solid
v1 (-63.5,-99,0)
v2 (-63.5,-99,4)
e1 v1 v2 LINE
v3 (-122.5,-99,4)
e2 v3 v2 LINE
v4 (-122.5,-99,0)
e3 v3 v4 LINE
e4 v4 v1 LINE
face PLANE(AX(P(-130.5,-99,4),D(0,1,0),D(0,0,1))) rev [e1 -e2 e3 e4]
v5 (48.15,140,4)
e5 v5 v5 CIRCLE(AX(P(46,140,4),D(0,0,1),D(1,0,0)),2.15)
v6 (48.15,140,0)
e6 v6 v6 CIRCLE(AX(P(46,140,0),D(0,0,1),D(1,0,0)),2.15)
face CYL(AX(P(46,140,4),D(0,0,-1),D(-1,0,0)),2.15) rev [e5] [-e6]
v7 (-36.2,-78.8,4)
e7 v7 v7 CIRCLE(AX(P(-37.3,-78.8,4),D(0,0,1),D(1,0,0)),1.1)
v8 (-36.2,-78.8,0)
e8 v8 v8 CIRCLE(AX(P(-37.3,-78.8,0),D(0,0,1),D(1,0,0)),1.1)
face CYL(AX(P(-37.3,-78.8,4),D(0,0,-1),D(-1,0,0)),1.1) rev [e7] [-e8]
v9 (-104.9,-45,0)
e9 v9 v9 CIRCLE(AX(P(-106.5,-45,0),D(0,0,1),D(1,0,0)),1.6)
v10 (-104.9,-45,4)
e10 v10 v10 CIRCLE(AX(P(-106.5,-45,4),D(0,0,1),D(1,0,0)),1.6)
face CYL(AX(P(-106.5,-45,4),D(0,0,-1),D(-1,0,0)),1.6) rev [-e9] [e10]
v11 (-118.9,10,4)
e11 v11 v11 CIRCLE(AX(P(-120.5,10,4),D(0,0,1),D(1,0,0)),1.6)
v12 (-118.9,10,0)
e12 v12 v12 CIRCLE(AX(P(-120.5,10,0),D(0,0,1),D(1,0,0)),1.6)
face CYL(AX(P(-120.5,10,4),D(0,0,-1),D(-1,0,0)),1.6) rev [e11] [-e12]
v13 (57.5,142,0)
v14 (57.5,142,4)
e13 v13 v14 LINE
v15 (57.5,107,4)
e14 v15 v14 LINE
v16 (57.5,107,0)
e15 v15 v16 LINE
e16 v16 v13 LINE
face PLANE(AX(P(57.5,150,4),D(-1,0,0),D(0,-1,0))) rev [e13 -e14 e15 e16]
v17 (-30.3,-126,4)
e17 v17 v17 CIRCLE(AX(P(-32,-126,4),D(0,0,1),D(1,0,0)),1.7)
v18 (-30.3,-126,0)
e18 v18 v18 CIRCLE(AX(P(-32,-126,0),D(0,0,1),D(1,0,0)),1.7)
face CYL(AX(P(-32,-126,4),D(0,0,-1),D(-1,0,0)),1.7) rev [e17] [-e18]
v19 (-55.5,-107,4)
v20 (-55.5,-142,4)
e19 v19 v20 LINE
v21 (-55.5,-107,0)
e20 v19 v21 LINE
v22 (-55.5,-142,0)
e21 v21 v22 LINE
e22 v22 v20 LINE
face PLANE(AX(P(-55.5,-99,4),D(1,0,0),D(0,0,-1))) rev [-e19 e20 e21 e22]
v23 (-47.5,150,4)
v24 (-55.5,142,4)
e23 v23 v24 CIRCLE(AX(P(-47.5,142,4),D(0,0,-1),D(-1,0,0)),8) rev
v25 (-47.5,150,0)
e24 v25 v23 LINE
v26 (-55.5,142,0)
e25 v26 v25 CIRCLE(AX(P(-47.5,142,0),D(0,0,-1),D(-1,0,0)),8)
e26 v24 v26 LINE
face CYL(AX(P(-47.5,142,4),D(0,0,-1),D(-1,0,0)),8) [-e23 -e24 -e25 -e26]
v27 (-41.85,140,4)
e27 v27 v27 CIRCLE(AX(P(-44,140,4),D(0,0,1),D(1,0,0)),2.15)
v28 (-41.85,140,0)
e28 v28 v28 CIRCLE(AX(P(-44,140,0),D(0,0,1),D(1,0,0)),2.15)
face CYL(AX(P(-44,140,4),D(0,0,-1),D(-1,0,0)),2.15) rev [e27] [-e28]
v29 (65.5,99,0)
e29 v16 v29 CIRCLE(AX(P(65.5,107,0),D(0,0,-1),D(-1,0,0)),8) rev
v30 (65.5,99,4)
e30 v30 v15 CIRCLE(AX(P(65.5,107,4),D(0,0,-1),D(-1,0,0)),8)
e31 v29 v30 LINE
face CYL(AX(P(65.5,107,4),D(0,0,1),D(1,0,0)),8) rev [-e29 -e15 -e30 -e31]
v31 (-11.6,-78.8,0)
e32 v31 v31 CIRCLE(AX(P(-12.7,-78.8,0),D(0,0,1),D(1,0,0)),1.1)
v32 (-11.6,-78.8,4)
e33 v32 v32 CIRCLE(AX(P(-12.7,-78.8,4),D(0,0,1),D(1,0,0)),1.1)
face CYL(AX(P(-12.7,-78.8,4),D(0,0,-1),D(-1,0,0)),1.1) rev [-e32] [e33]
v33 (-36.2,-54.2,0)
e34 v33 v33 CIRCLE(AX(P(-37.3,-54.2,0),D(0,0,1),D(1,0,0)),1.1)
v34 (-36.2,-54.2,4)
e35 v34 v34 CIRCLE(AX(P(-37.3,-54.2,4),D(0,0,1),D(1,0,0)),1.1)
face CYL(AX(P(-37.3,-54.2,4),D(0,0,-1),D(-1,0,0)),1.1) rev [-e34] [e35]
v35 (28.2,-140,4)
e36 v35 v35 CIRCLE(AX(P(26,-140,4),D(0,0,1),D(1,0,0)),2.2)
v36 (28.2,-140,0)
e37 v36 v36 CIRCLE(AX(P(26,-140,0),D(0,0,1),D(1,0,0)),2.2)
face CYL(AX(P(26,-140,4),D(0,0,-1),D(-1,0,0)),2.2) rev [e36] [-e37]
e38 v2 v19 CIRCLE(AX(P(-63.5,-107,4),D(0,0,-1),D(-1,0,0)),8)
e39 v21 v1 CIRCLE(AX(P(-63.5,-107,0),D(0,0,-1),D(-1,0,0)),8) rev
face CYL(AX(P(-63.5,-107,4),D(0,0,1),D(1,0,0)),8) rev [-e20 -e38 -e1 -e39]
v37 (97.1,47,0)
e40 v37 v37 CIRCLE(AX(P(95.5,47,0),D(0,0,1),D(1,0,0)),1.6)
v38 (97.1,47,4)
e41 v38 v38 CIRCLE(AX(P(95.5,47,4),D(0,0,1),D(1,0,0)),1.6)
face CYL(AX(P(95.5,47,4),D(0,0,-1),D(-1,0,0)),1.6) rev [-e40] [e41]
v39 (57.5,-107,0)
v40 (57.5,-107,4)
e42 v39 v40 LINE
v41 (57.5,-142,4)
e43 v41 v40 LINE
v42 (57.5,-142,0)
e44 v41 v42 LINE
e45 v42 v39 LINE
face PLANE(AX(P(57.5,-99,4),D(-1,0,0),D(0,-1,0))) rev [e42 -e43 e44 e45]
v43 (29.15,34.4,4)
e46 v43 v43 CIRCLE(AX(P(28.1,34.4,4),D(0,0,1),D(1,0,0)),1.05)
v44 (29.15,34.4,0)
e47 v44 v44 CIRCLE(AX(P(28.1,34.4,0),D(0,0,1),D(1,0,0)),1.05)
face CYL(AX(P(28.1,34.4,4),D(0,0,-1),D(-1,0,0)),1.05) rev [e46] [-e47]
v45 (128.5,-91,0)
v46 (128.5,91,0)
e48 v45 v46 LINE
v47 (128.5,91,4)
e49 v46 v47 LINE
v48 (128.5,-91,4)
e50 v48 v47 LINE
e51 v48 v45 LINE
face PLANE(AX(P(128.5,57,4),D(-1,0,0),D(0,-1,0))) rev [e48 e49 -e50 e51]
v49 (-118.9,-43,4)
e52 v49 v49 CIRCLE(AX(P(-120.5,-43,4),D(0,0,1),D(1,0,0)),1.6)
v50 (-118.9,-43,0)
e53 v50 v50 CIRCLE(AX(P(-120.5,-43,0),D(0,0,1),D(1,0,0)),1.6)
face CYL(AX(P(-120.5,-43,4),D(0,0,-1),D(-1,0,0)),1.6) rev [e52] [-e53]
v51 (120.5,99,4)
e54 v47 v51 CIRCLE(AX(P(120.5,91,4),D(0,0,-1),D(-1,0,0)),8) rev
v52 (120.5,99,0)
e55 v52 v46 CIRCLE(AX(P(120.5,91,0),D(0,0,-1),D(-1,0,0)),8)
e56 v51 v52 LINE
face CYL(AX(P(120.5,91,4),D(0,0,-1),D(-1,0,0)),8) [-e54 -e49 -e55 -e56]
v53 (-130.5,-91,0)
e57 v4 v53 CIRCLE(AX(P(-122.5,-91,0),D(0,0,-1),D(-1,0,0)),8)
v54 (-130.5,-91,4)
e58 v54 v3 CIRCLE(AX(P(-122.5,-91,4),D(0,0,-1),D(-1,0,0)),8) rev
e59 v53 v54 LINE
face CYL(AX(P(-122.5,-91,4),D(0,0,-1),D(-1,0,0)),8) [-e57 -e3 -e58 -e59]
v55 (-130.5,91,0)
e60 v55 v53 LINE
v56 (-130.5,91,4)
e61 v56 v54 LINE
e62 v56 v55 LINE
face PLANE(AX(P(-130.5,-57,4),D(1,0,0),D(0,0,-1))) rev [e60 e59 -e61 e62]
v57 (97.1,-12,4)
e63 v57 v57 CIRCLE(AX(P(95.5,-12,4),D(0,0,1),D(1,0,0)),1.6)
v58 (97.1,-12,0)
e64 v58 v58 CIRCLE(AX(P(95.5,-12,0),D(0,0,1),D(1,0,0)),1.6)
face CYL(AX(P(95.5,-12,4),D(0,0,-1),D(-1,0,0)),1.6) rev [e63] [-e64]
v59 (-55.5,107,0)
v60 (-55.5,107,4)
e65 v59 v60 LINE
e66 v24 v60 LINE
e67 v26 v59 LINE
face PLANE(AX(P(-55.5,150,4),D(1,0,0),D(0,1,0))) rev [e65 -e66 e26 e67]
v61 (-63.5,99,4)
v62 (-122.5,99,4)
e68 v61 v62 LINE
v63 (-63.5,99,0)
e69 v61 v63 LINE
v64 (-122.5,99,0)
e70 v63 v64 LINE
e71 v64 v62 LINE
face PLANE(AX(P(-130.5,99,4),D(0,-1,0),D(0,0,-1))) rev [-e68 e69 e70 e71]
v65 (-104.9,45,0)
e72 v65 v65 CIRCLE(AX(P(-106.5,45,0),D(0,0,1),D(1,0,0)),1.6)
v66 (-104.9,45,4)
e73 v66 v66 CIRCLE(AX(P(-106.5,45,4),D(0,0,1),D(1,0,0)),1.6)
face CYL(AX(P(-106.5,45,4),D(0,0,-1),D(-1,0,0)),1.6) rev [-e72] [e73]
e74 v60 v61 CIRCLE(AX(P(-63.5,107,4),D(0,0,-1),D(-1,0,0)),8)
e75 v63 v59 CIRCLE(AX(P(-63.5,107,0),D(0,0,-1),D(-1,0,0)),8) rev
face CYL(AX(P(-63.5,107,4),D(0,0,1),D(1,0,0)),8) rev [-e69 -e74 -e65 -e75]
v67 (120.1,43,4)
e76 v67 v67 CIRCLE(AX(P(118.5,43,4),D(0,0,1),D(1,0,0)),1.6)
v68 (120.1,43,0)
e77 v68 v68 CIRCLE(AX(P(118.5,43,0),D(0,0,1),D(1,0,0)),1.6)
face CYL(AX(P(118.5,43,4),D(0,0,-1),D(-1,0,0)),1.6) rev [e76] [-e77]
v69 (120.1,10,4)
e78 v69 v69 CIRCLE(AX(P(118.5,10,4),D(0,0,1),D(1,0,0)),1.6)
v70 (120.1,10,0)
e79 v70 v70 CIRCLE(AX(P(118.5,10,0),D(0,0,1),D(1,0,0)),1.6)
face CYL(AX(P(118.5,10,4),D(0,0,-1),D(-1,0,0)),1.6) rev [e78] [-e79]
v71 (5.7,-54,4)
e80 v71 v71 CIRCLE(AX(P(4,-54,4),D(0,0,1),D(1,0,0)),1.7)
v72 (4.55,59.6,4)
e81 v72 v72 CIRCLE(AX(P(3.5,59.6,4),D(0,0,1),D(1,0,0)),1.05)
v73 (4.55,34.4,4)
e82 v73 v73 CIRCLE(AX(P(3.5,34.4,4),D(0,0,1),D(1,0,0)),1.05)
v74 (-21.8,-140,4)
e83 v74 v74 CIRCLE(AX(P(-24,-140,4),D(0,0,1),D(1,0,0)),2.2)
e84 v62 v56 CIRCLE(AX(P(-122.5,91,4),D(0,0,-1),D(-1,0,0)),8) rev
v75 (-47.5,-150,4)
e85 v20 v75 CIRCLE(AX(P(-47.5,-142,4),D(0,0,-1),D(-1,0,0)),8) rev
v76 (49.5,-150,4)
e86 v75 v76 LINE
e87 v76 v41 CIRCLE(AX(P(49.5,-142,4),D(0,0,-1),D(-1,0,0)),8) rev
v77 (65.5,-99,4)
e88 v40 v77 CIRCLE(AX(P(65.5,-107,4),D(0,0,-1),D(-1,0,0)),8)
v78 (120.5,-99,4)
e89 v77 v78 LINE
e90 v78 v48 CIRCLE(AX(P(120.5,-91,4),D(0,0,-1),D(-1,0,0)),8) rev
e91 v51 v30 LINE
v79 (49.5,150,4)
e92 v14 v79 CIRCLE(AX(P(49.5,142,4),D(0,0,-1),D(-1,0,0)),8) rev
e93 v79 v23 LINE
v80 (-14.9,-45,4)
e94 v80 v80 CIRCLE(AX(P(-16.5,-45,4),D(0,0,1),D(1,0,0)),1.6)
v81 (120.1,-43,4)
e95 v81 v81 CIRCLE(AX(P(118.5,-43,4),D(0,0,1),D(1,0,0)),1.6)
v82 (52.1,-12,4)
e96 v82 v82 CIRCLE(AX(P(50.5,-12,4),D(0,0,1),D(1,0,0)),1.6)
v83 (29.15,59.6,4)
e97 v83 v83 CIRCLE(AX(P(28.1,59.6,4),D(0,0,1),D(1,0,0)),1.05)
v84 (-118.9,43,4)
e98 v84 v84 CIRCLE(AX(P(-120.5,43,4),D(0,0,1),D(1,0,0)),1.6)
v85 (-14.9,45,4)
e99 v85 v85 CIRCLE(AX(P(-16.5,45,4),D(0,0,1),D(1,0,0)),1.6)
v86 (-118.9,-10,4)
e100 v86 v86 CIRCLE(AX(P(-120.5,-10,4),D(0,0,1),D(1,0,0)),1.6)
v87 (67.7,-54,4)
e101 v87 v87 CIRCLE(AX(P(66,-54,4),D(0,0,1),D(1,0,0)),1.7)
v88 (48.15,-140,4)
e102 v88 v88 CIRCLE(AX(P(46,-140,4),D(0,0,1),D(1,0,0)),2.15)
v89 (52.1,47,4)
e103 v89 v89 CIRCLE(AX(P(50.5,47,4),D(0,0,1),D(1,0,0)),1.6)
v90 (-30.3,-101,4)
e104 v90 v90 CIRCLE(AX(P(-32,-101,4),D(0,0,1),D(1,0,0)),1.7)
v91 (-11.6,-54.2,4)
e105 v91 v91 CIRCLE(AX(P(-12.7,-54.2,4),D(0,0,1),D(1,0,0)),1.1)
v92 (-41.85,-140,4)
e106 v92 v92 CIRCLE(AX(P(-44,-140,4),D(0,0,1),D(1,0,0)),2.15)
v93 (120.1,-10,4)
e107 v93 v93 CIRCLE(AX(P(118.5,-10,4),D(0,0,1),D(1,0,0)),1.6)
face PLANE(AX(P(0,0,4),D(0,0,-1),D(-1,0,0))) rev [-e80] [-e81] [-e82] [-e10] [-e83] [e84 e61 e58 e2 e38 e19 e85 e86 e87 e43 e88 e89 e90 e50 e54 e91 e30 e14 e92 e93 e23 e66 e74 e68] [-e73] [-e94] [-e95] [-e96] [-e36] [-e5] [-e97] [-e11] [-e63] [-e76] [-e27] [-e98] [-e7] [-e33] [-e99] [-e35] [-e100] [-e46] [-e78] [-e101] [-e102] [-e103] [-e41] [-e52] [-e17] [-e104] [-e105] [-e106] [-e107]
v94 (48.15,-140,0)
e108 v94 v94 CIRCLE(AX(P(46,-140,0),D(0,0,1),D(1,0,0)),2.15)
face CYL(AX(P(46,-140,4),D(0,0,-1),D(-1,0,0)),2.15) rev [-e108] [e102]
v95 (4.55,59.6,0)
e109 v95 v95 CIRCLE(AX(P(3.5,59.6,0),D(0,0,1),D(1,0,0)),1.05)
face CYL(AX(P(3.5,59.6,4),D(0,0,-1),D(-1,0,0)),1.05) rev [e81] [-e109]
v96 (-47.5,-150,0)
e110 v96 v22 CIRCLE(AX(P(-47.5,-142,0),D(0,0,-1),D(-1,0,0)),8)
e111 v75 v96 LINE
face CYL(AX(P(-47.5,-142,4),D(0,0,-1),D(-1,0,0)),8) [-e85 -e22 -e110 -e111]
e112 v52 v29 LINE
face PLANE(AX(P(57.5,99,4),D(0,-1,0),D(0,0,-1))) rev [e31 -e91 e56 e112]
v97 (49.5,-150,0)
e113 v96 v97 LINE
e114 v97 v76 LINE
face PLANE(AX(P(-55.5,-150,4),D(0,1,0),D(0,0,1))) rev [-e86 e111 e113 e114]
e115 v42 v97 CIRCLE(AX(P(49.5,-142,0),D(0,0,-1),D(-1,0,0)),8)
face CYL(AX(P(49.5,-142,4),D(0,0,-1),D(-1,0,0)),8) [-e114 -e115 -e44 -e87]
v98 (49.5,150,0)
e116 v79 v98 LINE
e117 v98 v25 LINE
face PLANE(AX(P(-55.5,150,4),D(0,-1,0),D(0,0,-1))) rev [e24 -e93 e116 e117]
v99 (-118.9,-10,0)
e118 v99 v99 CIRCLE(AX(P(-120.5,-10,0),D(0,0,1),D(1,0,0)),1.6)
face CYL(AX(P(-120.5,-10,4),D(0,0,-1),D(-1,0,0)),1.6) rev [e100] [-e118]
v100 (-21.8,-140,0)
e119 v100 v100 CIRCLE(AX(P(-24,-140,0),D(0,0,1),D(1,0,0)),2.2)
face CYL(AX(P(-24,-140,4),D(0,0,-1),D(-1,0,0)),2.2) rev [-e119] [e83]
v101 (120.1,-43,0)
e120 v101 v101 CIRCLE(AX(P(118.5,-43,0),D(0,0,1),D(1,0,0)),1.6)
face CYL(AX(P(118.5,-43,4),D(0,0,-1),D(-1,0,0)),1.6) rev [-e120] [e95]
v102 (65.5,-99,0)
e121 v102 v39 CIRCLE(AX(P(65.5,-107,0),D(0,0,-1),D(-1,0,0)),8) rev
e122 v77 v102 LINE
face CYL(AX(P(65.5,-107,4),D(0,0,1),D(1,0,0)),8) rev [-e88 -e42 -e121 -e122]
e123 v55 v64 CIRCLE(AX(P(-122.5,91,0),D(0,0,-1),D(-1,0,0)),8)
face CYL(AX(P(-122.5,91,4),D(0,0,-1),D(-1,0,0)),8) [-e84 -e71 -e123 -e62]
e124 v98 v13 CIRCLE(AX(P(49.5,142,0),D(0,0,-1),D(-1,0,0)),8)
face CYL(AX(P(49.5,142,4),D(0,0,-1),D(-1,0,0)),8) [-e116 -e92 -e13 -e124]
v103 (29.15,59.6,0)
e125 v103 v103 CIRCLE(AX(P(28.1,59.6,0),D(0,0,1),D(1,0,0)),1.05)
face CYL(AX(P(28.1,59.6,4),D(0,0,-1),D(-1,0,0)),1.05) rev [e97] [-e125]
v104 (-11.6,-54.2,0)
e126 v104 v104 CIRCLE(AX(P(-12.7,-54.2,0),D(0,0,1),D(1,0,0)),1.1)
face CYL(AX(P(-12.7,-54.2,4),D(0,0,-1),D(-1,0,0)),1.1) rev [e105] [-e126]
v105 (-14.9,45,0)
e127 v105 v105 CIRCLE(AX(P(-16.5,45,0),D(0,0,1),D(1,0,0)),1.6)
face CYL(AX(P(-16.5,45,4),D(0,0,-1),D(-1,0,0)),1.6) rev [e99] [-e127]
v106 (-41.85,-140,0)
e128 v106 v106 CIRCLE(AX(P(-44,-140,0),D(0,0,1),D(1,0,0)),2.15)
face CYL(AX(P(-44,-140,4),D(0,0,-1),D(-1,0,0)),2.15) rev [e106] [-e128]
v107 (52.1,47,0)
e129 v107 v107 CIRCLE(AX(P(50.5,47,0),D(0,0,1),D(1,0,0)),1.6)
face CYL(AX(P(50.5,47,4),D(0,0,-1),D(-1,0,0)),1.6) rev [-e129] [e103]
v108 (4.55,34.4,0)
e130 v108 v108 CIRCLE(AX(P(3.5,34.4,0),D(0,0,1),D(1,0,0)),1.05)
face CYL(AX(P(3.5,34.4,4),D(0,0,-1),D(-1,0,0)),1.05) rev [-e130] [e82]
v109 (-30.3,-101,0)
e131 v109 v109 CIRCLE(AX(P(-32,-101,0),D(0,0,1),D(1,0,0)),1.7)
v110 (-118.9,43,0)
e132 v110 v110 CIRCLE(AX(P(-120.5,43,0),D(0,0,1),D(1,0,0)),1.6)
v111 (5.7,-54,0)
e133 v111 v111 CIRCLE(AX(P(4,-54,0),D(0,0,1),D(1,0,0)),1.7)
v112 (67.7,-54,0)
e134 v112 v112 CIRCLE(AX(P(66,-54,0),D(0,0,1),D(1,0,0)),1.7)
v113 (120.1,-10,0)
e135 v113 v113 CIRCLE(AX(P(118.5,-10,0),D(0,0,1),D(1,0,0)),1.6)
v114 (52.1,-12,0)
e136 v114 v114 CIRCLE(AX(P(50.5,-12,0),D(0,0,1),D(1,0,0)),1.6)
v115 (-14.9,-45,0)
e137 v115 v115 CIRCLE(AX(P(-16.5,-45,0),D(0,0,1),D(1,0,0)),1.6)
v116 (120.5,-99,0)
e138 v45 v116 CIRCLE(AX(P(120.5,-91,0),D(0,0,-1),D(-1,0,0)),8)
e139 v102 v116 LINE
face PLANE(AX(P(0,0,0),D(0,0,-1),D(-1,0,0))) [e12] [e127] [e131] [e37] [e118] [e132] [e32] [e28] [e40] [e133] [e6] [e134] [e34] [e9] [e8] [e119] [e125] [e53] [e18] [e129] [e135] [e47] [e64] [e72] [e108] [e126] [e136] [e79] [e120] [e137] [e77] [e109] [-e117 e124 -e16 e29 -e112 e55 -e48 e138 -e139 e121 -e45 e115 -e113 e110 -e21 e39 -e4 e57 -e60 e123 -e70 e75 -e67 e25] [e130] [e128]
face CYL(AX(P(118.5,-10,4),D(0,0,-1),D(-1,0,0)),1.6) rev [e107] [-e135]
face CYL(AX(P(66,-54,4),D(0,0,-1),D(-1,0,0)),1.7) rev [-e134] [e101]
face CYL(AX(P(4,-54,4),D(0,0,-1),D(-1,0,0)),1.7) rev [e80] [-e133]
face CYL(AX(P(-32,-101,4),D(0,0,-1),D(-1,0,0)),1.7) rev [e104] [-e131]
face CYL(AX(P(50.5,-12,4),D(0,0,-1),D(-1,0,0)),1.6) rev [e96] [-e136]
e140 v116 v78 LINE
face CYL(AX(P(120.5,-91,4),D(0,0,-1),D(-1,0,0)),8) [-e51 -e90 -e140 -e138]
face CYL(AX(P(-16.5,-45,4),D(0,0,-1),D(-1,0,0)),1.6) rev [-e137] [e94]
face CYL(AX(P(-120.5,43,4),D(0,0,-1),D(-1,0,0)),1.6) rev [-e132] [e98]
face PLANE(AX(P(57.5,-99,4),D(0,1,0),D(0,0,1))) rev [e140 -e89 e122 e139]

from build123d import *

# Parameters (mm, degrees)
SKETCH_281X300_25_R                    = 2.15
SKETCH_281X300_25_R_2                  = 2.2
SKETCH_281X300_25_R_3                  = 1.6
SKETCH_281X300_25_R_4                  = 1.05
F_4MM_DEPTH                            = 4
FILLET_1_R                             = 8
ELECTRONICS_4X_D3P4_ISO273_OUTLINE_R   = 1.1
ELECTRONICS_4X_D3P4_ISO273_OUTLINE_R_2 = 1.7
ELECTRONICS_4X_D3P4_ISO273_DEPTH       = 4


# Read off the part's stored shape, not the designer's step: Electronics_4x_D3p4_ISO273
with BuildPart() as part:
    # Sketch 281x300__25 → 4mm (new body)
    with BuildSketch(Plane.XY):
        Polygon((-55.5, 150), (-55.5, 99), (-130.5, 99), (-130.5, 57), (-130.5, -57), (-130.5, -99), (-55.5, -99), (-55.5, -150), (57.5, -150), (57.5, -99), (128.5, -99), (128.5, -57), (128.5, 57), (128.5, 99), (57.5, 99), (57.5, 150), align=None)
        with Locations((-44, 140)):
            Circle(SKETCH_281X300_25_R, mode=Mode.SUBTRACT)
        with Locations((26, -140)):
            Circle(SKETCH_281X300_25_R_2, mode=Mode.SUBTRACT)
        with Locations((-24, -140)):
            Circle(SKETCH_281X300_25_R_2, mode=Mode.SUBTRACT)
        with Locations((118.5, 10)):
            Circle(SKETCH_281X300_25_R_3, mode=Mode.SUBTRACT)
        with Locations((118.5, -10)):
            Circle(SKETCH_281X300_25_R_3, mode=Mode.SUBTRACT)
        with Locations((-120.5, 10)):
            Circle(SKETCH_281X300_25_R_3, mode=Mode.SUBTRACT)
        with Locations((-120.5, -10)):
            Circle(SKETCH_281X300_25_R_3, mode=Mode.SUBTRACT)
        with Locations((118.5, 43)):
            Circle(SKETCH_281X300_25_R_3, mode=Mode.SUBTRACT)
        with Locations((118.5, -43)):
            Circle(SKETCH_281X300_25_R_3, mode=Mode.SUBTRACT)
        with Locations((-120.5, 43)):
            Circle(SKETCH_281X300_25_R_3, mode=Mode.SUBTRACT)
        with Locations((-120.5, -43)):
            Circle(SKETCH_281X300_25_R_3, mode=Mode.SUBTRACT)
        with Locations((46, 140)):
            Circle(SKETCH_281X300_25_R, mode=Mode.SUBTRACT)
        with Locations((-44, -140)):
            Circle(SKETCH_281X300_25_R, mode=Mode.SUBTRACT)
        with Locations((46, -140)):
            Circle(SKETCH_281X300_25_R, mode=Mode.SUBTRACT)
        with Locations((-16.5, -45)):
            Circle(SKETCH_281X300_25_R_3, mode=Mode.SUBTRACT)
        with Locations((-106.5, -45)):
            Circle(SKETCH_281X300_25_R_3, mode=Mode.SUBTRACT)
        with Locations((-106.5, 45)):
            Circle(SKETCH_281X300_25_R_3, mode=Mode.SUBTRACT)
        with Locations((-16.5, 45)):
            Circle(SKETCH_281X300_25_R_3, mode=Mode.SUBTRACT)
        with Locations((50.5, -12)):
            Circle(SKETCH_281X300_25_R_3, mode=Mode.SUBTRACT)
        with Locations((95.5, -12)):
            Circle(SKETCH_281X300_25_R_3, mode=Mode.SUBTRACT)
        with Locations((50.5, 47)):
            Circle(SKETCH_281X300_25_R_3, mode=Mode.SUBTRACT)
        with Locations((95.5, 47)):
            Circle(SKETCH_281X300_25_R_3, mode=Mode.SUBTRACT)
        with Locations((3.5, 34.4)):
            Circle(SKETCH_281X300_25_R_4, mode=Mode.SUBTRACT)
        with Locations((28.1, 34.4)):
            Circle(SKETCH_281X300_25_R_4, mode=Mode.SUBTRACT)
        with Locations((3.5, 59.6)):
            Circle(SKETCH_281X300_25_R_4, mode=Mode.SUBTRACT)
        with Locations((28.1, 59.6)):
            Circle(SKETCH_281X300_25_R_4, mode=Mode.SUBTRACT)
    extrude(amount=F_4MM_DEPTH)

    # Fillet 1
    fillet_1_edges = [part.edges().sort_by_distance(p)[0] for p in [
        (-130.5, 99, 2),
        (-55.5, 99, 2),
        (-55.5, 150, 2),
        (57.5, 150, 2),
        (57.5, 99, 2),
        (128.5, 99, 2),
        (128.5, -99, 2),
        (57.5, -99, 2),
        (57.5, -150, 2),
        (-55.5, -150, 2),
        (-55.5, -99, 2),
        (-130.5, -99, 2),
    ]]
    fillet(fillet_1_edges, radius=FILLET_1_R)

    # Electronics_4x_D3p4_ISO273 outline → Electronics_4x_D3p4_ISO273 (cut)
    with BuildSketch(Plane.XY):
        with Locations((-37.3, -78.8)):
            Circle(ELECTRONICS_4X_D3P4_ISO273_OUTLINE_R)
        with Locations((66, -54)):
            Circle(ELECTRONICS_4X_D3P4_ISO273_OUTLINE_R_2)
        with Locations((4, -54)):
            Circle(ELECTRONICS_4X_D3P4_ISO273_OUTLINE_R_2)
        with Locations((-32, -101)):
            Circle(ELECTRONICS_4X_D3P4_ISO273_OUTLINE_R_2)
        with Locations((-12.7, -54.2)):
            Circle(ELECTRONICS_4X_D3P4_ISO273_OUTLINE_R)
        with Locations((-12.7, -78.8)):
            Circle(ELECTRONICS_4X_D3P4_ISO273_OUTLINE_R)
        with Locations((-37.3, -54.2)):
            Circle(ELECTRONICS_4X_D3P4_ISO273_OUTLINE_R)
        with Locations((-32, -126)):
            Circle(ELECTRONICS_4X_D3P4_ISO273_OUTLINE_R_2)
    extrude(amount=ELECTRONICS_4X_D3P4_ISO273_DEPTH, mode=Mode.SUBTRACT)


solid = part.part
